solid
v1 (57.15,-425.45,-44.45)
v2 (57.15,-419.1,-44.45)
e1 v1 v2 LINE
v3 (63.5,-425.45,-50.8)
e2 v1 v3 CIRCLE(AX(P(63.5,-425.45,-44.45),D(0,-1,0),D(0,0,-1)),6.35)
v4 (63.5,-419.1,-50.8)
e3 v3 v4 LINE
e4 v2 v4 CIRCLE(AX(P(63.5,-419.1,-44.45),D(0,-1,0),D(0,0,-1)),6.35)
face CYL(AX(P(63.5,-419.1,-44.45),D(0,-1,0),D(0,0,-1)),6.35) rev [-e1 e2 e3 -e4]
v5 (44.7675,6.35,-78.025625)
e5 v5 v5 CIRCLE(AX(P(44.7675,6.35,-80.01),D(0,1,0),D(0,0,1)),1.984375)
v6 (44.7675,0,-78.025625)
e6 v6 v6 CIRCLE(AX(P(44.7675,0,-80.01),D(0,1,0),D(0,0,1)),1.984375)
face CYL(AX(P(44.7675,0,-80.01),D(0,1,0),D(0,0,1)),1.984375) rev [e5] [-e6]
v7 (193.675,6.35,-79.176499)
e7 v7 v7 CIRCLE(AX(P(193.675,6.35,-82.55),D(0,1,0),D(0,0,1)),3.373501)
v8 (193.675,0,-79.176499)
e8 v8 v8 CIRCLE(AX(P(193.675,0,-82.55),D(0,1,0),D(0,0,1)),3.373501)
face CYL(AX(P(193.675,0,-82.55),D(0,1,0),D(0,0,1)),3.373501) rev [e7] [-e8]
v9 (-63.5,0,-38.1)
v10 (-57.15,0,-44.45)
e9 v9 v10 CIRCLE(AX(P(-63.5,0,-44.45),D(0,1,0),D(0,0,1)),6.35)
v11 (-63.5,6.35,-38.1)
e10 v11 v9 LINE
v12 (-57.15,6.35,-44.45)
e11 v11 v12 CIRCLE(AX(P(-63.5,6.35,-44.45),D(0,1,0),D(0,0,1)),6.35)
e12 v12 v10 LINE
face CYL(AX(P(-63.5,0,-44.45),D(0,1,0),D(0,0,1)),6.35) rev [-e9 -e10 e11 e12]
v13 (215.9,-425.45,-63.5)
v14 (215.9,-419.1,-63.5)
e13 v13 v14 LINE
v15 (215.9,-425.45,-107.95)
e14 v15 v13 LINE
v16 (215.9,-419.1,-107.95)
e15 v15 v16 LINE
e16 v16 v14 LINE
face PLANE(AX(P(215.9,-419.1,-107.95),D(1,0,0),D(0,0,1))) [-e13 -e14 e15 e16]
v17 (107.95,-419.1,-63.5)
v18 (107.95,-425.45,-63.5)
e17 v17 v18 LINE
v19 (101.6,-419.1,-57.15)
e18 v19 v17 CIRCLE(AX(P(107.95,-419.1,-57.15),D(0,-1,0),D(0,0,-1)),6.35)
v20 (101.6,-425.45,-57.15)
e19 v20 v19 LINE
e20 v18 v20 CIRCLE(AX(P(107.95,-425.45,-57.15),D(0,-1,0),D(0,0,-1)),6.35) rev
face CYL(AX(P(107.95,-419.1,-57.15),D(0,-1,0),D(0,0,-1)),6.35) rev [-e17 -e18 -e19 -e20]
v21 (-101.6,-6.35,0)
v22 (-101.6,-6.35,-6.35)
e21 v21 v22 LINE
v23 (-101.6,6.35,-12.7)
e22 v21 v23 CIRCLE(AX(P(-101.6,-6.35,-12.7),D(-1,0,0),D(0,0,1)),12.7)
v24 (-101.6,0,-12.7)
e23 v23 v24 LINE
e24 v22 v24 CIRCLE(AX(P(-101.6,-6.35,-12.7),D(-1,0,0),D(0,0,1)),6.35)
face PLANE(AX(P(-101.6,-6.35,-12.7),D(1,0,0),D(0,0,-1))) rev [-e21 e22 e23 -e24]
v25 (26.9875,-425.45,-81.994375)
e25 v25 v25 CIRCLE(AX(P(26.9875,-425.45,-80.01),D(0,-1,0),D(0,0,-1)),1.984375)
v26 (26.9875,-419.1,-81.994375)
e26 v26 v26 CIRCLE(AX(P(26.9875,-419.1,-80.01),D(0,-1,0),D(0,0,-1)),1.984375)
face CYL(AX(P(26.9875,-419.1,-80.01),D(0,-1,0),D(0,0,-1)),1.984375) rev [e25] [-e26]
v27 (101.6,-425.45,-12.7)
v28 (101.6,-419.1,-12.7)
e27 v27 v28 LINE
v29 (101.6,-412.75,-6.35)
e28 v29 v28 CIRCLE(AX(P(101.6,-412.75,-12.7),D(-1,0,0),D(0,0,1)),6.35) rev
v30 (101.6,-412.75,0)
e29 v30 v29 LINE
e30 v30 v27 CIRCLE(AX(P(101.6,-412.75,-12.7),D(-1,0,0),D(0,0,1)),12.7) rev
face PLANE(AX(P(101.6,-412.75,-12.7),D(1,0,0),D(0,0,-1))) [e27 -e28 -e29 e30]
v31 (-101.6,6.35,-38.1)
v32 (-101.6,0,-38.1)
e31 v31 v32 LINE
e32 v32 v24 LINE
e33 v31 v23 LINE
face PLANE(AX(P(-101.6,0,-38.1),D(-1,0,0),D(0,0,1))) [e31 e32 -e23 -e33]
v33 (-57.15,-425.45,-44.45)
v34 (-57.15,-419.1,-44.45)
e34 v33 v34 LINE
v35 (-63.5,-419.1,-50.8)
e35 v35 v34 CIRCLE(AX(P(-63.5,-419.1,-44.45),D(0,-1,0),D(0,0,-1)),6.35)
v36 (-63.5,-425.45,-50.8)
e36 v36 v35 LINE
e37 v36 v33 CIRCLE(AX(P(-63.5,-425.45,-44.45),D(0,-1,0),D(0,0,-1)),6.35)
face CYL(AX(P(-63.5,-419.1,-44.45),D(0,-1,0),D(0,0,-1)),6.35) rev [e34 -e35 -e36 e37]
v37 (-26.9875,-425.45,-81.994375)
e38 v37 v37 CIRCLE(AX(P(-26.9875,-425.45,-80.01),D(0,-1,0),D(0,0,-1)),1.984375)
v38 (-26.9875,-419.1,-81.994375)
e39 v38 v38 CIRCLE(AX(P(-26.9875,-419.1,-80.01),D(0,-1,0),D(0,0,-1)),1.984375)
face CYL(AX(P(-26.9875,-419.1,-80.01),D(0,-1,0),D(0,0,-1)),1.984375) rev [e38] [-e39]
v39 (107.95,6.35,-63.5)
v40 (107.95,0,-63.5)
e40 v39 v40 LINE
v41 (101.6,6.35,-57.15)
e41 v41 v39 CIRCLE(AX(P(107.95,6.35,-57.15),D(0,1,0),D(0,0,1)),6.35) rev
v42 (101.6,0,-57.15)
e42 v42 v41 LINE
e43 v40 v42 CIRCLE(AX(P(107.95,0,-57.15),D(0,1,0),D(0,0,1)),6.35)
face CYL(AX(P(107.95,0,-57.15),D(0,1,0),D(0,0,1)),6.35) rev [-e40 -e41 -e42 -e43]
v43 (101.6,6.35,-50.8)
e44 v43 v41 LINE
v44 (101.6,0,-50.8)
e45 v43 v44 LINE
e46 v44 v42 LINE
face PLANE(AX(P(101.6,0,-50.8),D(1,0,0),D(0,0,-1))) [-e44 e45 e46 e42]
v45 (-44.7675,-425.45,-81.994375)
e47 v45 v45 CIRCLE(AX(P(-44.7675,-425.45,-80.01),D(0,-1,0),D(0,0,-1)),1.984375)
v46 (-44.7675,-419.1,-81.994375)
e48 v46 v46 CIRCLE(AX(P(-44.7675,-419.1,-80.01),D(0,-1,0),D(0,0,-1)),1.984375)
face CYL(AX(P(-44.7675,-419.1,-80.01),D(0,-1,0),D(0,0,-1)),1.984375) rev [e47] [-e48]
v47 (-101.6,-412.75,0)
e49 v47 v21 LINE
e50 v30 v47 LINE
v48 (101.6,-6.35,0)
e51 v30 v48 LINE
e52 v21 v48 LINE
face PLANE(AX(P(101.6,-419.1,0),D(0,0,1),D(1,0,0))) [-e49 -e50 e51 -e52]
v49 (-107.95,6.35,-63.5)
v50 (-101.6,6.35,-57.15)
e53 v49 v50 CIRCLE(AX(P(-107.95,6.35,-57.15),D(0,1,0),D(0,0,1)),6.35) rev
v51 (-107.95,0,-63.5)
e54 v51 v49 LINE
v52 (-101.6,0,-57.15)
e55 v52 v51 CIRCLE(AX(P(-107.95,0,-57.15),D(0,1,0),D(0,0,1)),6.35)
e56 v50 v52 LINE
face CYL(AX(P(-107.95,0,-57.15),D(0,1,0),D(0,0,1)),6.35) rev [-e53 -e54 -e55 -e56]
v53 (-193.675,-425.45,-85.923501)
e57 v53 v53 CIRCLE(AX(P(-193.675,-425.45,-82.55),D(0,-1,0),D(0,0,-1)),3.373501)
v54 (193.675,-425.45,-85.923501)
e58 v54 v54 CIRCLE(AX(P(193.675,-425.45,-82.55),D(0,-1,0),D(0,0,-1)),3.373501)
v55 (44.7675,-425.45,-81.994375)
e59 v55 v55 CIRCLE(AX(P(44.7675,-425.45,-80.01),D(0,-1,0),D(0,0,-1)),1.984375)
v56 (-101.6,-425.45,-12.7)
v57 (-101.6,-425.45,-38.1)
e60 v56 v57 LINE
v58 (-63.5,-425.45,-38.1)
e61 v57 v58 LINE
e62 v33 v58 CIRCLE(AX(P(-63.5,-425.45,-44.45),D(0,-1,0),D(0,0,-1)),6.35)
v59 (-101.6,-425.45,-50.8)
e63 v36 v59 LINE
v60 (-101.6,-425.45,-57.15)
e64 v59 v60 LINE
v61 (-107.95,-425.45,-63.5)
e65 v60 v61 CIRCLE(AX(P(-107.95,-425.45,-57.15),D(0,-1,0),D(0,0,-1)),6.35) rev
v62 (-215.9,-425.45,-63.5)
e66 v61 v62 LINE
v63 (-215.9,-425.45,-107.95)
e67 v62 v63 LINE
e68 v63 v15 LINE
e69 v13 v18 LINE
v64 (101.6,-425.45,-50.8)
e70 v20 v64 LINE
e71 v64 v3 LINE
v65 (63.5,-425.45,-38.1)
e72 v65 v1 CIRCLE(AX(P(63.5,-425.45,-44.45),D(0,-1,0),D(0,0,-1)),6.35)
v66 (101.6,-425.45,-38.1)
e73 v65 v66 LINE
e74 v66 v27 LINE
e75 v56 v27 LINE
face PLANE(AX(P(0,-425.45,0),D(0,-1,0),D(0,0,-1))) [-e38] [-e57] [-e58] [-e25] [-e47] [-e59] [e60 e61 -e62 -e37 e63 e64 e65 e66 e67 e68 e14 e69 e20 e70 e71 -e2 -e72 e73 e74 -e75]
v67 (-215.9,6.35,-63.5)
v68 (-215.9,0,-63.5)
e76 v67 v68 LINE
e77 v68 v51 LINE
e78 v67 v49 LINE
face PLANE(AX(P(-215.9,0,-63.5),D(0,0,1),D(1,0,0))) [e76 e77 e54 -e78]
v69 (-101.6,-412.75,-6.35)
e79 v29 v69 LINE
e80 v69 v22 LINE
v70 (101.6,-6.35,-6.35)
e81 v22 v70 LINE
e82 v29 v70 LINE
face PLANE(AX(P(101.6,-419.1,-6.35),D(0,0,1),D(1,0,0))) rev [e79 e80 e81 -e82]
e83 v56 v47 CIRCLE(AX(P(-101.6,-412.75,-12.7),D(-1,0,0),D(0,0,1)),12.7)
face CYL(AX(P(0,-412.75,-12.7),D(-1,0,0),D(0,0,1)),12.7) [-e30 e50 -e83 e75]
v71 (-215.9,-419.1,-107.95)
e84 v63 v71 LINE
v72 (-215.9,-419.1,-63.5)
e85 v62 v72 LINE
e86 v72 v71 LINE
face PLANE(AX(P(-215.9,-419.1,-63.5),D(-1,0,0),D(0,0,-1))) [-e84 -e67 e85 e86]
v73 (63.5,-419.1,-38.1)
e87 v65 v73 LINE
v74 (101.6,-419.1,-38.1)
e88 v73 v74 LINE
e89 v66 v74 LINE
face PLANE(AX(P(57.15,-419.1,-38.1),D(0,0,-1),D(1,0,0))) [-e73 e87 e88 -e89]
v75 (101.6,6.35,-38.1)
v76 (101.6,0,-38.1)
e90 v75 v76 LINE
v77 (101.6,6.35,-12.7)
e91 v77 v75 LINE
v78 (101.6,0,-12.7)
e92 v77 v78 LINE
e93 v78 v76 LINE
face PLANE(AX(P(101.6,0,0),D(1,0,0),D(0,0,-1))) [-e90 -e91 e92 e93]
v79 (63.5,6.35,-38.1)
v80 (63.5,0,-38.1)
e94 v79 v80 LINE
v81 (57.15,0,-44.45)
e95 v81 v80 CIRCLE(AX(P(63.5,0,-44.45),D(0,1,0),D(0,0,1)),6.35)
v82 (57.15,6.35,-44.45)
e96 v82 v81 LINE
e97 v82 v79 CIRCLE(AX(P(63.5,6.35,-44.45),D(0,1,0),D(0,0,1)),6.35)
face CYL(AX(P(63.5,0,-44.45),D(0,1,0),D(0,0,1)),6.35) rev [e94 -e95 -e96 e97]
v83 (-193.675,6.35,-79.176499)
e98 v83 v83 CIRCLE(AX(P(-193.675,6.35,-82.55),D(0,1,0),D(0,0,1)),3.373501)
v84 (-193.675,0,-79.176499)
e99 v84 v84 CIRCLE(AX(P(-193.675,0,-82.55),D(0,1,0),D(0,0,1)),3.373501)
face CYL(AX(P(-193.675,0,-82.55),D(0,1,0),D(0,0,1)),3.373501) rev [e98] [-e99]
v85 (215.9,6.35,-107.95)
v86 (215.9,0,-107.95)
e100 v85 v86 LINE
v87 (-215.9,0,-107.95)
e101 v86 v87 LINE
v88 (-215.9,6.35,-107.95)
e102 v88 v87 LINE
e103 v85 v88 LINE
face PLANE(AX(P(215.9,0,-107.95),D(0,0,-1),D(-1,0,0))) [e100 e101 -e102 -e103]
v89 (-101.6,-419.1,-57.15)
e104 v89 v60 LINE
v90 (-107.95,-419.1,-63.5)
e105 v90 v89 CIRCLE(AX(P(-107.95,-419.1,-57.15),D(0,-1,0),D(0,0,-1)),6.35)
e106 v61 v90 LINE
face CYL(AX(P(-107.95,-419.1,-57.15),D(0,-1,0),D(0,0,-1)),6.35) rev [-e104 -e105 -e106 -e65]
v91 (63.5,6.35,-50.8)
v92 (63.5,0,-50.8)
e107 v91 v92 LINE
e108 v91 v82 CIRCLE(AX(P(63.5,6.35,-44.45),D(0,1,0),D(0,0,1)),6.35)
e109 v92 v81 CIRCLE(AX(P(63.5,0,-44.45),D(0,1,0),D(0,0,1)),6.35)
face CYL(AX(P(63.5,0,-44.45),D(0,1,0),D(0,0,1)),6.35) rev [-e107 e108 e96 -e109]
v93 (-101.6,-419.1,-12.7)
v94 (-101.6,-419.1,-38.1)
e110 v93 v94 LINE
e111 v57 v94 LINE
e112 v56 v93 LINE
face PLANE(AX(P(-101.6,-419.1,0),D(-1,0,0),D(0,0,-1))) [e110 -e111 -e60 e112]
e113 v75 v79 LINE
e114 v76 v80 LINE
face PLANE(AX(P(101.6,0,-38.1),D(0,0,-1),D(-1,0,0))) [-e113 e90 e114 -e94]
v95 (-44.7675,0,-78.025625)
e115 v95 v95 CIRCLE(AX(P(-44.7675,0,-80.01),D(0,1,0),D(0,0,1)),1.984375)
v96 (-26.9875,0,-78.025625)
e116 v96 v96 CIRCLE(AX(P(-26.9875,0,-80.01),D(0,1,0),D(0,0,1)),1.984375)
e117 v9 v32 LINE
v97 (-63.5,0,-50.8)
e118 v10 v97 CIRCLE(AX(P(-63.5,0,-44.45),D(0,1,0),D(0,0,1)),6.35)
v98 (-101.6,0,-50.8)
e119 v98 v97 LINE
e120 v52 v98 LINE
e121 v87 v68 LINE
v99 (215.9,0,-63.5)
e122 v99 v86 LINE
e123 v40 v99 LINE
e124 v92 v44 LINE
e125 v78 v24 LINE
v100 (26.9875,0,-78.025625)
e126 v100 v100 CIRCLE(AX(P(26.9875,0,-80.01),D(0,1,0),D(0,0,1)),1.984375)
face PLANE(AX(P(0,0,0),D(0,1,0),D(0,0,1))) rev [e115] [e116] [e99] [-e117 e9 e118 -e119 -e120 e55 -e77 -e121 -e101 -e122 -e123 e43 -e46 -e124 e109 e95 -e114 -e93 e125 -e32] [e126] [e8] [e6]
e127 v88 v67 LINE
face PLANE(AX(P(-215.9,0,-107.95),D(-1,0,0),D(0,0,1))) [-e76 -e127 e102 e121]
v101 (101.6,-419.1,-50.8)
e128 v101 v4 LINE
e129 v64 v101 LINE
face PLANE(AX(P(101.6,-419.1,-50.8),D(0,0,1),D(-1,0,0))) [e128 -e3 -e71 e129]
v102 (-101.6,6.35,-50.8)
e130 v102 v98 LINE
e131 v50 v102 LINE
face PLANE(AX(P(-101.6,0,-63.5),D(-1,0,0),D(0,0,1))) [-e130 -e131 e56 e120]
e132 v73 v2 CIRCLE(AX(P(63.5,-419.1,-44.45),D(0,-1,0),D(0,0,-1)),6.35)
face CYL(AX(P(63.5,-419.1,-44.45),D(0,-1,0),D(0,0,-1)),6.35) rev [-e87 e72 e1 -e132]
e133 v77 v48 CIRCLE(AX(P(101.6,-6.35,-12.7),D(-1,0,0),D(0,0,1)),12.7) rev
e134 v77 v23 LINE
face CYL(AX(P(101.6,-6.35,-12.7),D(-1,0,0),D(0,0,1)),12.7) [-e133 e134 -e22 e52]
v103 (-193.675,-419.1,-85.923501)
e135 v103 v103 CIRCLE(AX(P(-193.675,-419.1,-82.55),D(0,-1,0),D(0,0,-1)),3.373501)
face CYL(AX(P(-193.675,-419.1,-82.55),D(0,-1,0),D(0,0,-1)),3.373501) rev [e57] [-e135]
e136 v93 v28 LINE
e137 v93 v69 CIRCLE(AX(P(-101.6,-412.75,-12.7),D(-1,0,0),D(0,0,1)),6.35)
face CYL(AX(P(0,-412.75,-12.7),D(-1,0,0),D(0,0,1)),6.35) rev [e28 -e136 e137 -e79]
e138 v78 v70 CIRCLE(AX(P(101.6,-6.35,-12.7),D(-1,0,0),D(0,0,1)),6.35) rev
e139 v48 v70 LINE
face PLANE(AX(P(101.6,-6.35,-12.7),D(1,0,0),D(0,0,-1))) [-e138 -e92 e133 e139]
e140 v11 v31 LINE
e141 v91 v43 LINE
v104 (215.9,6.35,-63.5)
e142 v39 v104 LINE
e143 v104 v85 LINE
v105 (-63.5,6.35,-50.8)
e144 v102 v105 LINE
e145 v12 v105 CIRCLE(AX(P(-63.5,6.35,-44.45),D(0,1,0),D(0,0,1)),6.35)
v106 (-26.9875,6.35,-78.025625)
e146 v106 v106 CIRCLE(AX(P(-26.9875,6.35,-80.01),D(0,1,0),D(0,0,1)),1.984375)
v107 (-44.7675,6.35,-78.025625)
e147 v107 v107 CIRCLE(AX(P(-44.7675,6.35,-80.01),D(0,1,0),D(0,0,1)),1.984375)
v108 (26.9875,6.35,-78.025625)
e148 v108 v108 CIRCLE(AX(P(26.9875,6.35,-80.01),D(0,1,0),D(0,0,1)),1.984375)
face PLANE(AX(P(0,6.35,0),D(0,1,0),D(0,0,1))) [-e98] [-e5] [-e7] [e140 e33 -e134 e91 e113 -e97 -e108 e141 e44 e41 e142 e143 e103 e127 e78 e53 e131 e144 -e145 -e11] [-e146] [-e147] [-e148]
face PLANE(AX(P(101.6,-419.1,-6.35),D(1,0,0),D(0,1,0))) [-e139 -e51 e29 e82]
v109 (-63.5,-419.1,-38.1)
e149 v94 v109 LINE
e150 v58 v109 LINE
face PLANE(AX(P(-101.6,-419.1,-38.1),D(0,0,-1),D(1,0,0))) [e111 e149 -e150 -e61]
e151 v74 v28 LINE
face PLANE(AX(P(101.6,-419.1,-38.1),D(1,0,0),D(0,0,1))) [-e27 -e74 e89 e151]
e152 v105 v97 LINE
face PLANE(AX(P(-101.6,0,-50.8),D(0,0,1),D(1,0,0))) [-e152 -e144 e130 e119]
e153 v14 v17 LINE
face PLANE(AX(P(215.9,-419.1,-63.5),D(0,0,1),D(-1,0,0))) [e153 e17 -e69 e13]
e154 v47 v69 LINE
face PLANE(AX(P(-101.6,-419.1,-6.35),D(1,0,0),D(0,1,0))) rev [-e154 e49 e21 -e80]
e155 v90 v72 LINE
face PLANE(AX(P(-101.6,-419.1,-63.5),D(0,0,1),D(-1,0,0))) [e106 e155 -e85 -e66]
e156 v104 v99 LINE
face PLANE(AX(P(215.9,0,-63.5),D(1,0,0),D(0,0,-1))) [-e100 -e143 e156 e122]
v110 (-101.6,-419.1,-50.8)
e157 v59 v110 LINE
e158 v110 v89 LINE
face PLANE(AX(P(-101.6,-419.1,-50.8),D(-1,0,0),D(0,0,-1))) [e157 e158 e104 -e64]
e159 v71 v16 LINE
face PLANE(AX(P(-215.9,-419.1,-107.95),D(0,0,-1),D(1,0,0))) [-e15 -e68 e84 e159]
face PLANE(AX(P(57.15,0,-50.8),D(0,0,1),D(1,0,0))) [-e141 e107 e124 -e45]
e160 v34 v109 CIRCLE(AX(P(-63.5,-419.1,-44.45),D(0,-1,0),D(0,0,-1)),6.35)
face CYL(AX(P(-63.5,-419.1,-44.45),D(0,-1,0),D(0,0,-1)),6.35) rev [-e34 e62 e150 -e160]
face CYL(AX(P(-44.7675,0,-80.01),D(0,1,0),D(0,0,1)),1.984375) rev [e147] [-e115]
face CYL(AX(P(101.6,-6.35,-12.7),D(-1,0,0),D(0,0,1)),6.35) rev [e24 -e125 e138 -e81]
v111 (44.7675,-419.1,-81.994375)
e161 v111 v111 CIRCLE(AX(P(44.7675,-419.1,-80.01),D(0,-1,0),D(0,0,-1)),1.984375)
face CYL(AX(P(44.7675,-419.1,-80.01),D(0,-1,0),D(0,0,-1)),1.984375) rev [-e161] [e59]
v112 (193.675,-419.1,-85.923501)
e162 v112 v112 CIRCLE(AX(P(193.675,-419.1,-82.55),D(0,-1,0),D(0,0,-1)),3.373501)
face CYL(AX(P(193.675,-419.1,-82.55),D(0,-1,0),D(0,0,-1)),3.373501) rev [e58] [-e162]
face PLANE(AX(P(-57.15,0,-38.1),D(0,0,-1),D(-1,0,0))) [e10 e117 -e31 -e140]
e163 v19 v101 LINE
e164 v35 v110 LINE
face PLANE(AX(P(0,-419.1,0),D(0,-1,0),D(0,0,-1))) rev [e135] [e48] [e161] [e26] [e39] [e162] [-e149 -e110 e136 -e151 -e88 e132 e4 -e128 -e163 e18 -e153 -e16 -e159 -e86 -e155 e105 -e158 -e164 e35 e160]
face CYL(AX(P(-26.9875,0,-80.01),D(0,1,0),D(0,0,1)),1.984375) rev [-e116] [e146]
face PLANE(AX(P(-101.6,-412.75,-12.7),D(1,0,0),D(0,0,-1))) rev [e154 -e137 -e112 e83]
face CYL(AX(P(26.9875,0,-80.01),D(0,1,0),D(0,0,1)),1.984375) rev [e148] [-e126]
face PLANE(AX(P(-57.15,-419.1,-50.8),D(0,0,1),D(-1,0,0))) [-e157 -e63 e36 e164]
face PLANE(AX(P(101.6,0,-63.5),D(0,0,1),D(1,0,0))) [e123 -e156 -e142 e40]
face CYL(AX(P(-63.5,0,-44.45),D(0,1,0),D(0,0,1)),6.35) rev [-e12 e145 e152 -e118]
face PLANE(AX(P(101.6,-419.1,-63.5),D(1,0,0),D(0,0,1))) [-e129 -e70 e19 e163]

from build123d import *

# Parameters (mm, degrees)
BOSS_EXTRUDE1_DEPTH              = 6.35
SKETCH2_W                        = 203.2
SKETCH2_H                        = 6.35
BOSS_EXTRUDE2_DEPTH              = 419.1
BOSS_EXTRUDE3_DEPTH              = 6.35
F_17_64_0_26563_DIAMETER_HOLE1_D = 6.747002
F_5_32_0_15625_DIAMETER_HOLE1_D  = 3.96875
FILLET1_R                        = 6.35
CONVERT_SOLID1_START             = -101.6
CONVERT_SOLID1_DEPTH             = 203.2
CONVERT_SOLID1_2_DEPTH           = 203.2
FILLET2_R                        = 6.35


# Read off the part's stored shape, not the designer's step: Convert-Solid1
with BuildPart() as part:
    # Sketch1 → Boss-Extrude1 (new body)
    with BuildSketch(Plane(origin=(0, 0, 0), x_dir=(1, 0, 0), z_dir=(0, 1, 0))):
        Polygon((-215.9, 107.95), (-215.9, 63.5), (-101.6, 63.5), (-101.6, 50.8), (-57.15, 50.8), (-57.15, 38.1), (-101.6, 38.1), (-101.6, 0), (101.6, 0), (101.6, 38.1), (57.15, 38.1), (57.15, 50.8), (101.6, 50.8), (101.6, 63.5), (215.9, 63.5), (215.9, 107.95), align=None)
    extrude(amount=BOSS_EXTRUDE1_DEPTH)

    # Sketch2 → Boss-Extrude2 (add)
    with BuildSketch(Plane.XZ):
        with Locations((0, -3.175)):
            Rectangle(SKETCH2_W, SKETCH2_H)
    extrude(amount=BOSS_EXTRUDE2_DEPTH)

    # Sketch3 → Boss-Extrude3 (add)
    with BuildSketch(Plane.XZ.offset(419.1)):
        Polygon((-101.6, -50.8), (-101.6, -63.5), (-215.9, -63.5), (-215.9, -107.95), (215.9, -107.95), (215.9, -63.5), (101.6, -63.5), (101.6, -50.8), (57.15, -50.8), (57.15, -38.1), (101.6, -38.1), (101.6, 0), (-101.6, 0), (-101.6, -38.1), (-57.15, -38.1), (-57.15, -50.8), align=None)
    extrude(amount=BOSS_EXTRUDE3_DEPTH)

    # 17/64 (0.26563) Diameter Hole1 (through all)
    with Locations(Plane(origin=(0, 6.35, 0), x_dir=(1, 0, 0), z_dir=(0, 1, 0))):
        with Locations((-193.675, 82.55), (193.675, 82.55)):
            Hole(F_17_64_0_26563_DIAMETER_HOLE1_D / 2)

    # 5/32 (0.15625) Diameter Hole1 (through all)
    with Locations(Plane(origin=(0, 6.35, 0), x_dir=(1, 0, 0), z_dir=(0, 1, 0))):
        with Locations((-44.7675, 80.01), (-26.9875, 80.01), (26.9875, 80.01), (44.7675, 80.01)):
            Hole(F_5_32_0_15625_DIAMETER_HOLE1_D / 2)

    # Fillet1
    fillet1_edges = [part.edges().sort_by_distance(p)[0] for p in [
        (57.15, -422.275, -38.1),
        (57.15, -422.275, -50.8),
        (-57.15, -422.275, -38.1),
        (-57.15, -422.275, -50.8),
        (57.15, 3.175, -38.1),
        (57.15, 3.175, -50.8),
        (-57.15, 3.175, -38.1),
        (-57.15, 3.175, -50.8),
    ]]
    fillet(fillet1_edges, radius=FILLET1_R - 0.0001)  # a hair under: the kernel refuses the full size

    # Convert-Solid1 outline → Convert-Solid1 (cut)
    with BuildSketch(Plane.YZ.offset(CONVERT_SOLID1_START)):
        with BuildLine():
            Line((6.35, 0), (-6.35, 0))
            ThreePointArc((-6.35, 0), (2.630256121, -3.719743879), (6.35, -12.7))
            Line((6.35, -12.7), (6.35, 0))
        make_face()
        with BuildLine():
            ThreePointArc((-425.45, -12.7), (-421.730256121, -3.719743879), (-412.75, 0))
            Line((-412.75, 0), (-425.45, 0))
            Line((-425.45, 0), (-425.45, -12.7))
        make_face()
    extrude(amount=CONVERT_SOLID1_DEPTH, mode=Mode.SUBTRACT)

    # Convert-Solid1 2 outline → Convert-Solid1 2 (add)
    with BuildSketch(Plane.YZ.offset(CONVERT_SOLID1_START)):
        with BuildLine():
            Line((0, -6.35), (-6.35, -6.35))
            ThreePointArc((-6.35, -6.35), (-1.859871939, -8.209871939), (0, -12.7))
            Line((0, -12.7), (0, -6.35))
        make_face()
        with BuildLine():
            ThreePointArc((-419.1, -12.7), (-417.240128061, -8.209871939), (-412.75, -6.35))
            Line((-412.75, -6.35), (-419.1, -6.35))
            Line((-419.1, -6.35), (-419.1, -12.7))
        make_face()
    extrude(amount=CONVERT_SOLID1_2_DEPTH)

    # Fillet2
    fillet2_edges = [part.edges().sort_by_distance(p)[0] for p in [
        (101.6, 3.175, -63.5),
        (-101.6, 3.175, -63.5),
        (-101.6, -422.275, -63.5),
        (101.6, -422.275, -63.5),
    ]]
    fillet(fillet2_edges, radius=FILLET2_R)


solid = part.part
